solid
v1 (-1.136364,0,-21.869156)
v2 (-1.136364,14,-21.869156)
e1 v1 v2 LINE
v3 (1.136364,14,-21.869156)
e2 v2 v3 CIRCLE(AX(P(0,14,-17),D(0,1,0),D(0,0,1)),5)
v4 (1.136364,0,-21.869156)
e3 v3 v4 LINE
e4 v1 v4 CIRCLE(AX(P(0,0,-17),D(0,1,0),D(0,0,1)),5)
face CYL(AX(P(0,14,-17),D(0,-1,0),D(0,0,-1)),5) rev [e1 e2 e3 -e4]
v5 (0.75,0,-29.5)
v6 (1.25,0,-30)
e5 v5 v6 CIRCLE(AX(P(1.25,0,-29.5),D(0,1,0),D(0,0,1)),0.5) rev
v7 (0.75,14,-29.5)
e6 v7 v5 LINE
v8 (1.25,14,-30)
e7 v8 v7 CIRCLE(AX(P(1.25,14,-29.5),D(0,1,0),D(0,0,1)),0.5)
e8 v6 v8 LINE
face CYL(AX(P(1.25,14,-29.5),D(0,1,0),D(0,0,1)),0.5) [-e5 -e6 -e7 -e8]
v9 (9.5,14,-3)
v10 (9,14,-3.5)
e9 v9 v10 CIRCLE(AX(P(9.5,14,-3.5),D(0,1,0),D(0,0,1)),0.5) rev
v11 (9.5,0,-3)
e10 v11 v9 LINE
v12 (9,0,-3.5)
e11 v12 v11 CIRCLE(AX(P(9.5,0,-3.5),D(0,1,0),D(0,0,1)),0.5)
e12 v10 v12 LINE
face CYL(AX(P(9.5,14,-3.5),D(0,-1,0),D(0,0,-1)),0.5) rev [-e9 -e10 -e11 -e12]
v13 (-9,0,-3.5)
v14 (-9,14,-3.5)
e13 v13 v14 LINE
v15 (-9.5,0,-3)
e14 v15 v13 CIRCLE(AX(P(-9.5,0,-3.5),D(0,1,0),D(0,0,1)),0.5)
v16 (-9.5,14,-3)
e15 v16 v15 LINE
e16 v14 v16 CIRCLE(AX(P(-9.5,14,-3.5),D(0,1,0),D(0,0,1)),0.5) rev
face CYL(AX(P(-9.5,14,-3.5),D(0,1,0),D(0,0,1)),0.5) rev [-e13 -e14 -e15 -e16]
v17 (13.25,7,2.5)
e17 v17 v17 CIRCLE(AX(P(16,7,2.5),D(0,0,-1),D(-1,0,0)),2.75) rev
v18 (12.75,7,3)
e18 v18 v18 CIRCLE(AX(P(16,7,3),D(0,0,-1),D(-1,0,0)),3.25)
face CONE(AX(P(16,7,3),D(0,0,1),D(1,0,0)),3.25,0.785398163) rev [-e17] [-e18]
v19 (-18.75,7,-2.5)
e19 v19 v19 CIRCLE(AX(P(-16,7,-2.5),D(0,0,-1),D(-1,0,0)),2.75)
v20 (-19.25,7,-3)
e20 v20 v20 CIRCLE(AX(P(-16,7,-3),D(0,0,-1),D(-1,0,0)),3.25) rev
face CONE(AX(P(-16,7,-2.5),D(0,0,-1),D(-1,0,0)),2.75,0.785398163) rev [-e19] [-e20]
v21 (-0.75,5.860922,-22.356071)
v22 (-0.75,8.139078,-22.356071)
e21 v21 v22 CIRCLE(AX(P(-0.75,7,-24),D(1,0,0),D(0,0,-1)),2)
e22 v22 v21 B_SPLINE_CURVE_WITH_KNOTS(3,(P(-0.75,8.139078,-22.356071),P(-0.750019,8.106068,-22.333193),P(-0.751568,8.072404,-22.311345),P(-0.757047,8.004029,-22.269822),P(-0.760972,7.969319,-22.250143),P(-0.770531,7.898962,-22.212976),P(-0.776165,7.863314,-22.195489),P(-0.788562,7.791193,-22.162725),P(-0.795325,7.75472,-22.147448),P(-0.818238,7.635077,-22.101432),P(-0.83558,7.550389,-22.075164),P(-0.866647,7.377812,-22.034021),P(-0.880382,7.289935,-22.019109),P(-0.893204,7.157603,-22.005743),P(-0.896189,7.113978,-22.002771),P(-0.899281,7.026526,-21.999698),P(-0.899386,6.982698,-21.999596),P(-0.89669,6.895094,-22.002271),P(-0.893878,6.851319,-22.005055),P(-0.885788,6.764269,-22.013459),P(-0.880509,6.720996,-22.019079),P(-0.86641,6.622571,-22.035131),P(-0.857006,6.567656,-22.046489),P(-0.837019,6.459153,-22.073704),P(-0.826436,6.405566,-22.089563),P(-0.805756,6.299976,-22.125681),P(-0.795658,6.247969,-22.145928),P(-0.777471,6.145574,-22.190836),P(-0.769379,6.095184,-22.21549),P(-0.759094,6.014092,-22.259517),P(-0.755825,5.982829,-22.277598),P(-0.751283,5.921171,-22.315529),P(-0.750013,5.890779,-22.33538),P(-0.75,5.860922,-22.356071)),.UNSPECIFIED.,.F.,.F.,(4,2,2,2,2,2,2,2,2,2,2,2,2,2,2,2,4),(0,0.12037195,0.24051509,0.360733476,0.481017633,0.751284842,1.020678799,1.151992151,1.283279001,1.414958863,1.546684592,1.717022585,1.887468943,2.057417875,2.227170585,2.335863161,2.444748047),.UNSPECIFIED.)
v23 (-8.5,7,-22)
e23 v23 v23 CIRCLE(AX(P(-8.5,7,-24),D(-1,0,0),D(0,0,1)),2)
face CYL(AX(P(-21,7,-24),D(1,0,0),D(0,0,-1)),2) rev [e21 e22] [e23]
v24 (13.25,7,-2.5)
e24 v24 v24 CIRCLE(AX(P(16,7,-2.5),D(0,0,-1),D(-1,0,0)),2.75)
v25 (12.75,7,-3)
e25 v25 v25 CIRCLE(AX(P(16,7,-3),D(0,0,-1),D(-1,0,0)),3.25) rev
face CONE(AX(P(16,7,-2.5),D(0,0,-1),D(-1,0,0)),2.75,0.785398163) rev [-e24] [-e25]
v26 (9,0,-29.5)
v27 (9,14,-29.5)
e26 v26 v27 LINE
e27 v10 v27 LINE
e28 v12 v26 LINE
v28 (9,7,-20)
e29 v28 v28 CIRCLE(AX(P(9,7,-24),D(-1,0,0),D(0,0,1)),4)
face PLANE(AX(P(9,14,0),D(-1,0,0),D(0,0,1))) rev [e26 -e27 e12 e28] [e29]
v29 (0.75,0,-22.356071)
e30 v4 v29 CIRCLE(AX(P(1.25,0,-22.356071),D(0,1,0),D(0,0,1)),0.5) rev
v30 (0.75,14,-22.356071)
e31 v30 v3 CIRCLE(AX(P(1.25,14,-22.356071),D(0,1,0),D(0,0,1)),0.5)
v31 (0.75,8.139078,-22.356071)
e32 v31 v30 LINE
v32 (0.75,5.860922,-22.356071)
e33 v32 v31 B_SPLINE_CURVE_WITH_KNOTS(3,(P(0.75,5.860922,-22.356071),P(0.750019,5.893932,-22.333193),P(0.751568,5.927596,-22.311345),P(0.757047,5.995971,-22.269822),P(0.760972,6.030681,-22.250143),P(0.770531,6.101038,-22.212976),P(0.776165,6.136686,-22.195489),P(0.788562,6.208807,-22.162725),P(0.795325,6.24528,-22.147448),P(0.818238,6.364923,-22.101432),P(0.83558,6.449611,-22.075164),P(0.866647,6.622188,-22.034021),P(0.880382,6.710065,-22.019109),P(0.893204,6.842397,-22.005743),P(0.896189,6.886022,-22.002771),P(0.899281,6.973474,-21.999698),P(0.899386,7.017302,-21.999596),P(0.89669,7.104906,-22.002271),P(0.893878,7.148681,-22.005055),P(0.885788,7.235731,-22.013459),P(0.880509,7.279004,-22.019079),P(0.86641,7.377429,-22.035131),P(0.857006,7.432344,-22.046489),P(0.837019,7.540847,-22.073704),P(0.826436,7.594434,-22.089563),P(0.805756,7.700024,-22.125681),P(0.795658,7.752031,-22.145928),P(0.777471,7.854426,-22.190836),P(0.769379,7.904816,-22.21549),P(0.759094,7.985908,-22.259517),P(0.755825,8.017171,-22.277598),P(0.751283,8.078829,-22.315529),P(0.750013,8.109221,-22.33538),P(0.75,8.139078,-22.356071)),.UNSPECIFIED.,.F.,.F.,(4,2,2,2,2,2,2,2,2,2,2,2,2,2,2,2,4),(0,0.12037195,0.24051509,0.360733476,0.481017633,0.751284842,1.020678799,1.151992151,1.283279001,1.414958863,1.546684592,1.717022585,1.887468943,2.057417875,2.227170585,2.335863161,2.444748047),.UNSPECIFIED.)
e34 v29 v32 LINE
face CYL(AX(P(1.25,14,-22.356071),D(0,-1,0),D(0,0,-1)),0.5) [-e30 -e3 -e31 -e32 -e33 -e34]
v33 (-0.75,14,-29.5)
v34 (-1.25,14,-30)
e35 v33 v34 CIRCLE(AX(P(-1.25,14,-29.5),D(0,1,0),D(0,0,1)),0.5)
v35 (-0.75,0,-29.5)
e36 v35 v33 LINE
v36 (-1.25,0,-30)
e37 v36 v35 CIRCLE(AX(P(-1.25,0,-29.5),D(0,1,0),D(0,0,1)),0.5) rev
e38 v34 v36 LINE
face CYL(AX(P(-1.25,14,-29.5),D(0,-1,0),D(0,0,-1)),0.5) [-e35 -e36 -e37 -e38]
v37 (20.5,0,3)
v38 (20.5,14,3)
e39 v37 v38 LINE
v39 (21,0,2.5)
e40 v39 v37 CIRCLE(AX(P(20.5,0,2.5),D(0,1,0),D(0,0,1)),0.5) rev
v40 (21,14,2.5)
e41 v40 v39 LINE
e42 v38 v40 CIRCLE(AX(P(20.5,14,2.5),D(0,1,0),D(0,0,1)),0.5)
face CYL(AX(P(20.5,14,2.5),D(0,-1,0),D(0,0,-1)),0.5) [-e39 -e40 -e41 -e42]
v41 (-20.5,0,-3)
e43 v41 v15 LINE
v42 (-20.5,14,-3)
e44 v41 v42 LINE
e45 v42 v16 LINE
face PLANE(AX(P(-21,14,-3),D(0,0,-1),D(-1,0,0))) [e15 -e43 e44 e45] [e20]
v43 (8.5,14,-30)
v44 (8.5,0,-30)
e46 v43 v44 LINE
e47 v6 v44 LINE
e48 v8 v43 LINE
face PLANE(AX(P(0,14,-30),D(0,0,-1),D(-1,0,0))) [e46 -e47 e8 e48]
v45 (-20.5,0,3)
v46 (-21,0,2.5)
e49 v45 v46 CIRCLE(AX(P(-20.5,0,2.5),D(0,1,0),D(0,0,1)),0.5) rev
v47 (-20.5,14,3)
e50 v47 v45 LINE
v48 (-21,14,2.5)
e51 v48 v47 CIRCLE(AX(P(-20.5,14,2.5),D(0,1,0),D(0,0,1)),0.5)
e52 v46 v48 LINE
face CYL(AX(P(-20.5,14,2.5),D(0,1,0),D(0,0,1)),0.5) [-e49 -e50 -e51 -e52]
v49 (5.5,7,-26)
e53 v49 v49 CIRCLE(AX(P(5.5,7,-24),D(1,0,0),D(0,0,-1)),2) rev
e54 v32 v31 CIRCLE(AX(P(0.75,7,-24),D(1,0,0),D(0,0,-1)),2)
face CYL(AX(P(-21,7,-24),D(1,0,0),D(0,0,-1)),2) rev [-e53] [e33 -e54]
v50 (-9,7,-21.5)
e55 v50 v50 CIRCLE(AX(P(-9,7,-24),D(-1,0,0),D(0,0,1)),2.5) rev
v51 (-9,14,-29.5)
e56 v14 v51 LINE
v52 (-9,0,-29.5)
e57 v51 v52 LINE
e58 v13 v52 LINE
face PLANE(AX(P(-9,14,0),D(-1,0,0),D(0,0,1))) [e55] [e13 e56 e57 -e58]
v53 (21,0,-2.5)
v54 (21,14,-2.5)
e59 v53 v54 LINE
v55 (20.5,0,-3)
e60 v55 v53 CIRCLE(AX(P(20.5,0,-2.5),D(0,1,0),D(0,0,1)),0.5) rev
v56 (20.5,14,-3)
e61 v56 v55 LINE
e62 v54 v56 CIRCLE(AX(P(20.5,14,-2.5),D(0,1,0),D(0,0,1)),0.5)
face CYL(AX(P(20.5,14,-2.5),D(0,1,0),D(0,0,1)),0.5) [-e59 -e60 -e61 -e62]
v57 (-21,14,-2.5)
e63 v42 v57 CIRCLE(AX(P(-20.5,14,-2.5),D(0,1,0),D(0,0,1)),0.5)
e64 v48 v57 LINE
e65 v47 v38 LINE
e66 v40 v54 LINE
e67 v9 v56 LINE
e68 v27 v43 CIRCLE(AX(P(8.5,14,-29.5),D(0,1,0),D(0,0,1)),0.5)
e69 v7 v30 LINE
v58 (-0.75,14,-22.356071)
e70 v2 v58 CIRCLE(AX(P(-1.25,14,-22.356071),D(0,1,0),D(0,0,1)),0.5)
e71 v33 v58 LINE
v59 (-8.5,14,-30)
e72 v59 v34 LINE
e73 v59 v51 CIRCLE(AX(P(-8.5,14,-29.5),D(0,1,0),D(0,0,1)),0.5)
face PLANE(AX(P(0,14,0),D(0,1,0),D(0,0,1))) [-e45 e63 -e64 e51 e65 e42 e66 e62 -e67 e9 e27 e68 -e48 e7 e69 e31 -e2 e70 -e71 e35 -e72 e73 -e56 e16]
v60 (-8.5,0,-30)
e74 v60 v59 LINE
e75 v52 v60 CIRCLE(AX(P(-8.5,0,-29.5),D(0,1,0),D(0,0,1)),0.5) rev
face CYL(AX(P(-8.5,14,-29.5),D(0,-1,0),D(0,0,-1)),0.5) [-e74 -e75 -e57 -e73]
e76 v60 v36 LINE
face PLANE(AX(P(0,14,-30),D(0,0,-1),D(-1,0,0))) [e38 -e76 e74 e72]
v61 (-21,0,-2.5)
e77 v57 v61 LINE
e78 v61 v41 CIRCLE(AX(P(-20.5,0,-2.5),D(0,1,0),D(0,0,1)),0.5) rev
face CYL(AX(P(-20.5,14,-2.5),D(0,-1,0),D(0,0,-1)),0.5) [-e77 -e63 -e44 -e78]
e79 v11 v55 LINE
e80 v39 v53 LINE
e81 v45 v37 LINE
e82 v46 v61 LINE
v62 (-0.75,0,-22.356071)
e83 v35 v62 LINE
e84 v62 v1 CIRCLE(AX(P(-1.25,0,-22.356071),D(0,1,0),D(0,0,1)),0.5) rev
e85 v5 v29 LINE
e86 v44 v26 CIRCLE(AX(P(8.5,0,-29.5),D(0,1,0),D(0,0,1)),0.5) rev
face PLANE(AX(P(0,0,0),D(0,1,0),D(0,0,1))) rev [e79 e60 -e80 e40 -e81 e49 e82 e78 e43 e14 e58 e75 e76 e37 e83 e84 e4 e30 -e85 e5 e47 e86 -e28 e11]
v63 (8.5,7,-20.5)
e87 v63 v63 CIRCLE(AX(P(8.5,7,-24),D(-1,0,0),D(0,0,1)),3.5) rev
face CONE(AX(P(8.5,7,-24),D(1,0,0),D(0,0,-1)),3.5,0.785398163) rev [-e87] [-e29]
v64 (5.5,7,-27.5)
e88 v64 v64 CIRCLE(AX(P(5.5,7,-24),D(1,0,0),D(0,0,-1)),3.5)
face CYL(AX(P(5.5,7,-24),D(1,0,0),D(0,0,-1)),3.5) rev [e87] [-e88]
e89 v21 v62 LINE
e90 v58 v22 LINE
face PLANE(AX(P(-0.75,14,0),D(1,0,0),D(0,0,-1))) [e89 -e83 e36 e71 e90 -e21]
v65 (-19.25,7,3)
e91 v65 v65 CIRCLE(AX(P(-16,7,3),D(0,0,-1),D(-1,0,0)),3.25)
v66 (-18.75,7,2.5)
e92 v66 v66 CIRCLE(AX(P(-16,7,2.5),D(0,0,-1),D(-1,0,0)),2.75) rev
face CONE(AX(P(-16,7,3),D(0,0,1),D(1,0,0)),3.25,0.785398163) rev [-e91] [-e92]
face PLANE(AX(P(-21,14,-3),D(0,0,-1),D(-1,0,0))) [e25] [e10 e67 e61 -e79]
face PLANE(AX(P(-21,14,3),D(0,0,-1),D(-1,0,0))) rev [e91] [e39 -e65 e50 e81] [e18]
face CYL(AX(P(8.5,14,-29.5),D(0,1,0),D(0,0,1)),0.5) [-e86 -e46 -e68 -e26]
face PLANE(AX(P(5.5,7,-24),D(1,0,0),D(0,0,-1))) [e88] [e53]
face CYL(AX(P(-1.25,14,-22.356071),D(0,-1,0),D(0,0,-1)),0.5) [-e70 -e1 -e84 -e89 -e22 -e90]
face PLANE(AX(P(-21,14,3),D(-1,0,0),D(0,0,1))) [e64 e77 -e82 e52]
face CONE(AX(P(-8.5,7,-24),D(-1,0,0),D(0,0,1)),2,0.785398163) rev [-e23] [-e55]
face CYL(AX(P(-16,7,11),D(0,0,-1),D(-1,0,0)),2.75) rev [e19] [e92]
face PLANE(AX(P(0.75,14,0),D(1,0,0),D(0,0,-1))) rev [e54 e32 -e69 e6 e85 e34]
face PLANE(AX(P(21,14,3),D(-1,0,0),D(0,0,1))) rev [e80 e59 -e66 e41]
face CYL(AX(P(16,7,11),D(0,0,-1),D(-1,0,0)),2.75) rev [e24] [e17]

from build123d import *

# Parameters (mm, degrees)
BOSS_EXTRUDE1_DEPTH = 14
SKETCH2_R           = 2.75
CUT_EXTRUDE1_DEPTH  = 14
SKETCH3_R           = 2
CUT_EXTRUDE2_DEPTH  = 45.676615807
SKETCH4_R           = 3.5
CUT_EXTRUDE3_DEPTH  = 3.5
FILLET1_R           = 0.5
CHAMFER1_SIZE       = 0.5


with BuildPart() as part:
    # Sketch1 → Boss-Extrude1 (new body)
    with BuildSketch(Plane(origin=(0, 0, 0), x_dir=(1, 0, 0), z_dir=(0, 1, 0))):
        with BuildLine():
            Line((-21, 3), (-21, -3))
            Line((-21, -3), (21, -3))
            Line((21, -3), (21, 3))
            Line((21, 3), (9, 3))
            Line((9, 3), (9, 30))
            Line((9, 30), (0.75, 30))
            Line((0.75, 30), (0.75, 21.943429983))
            ThreePointArc((0.75, 21.943429983), (0, 12), (-0.75, 21.943429983))
            Line((-0.75, 21.943429983), (-0.75, 30))
            Line((-0.75, 30), (-9, 30))
            Line((-9, 30), (-9, 3))
            Line((-9, 3), (-21, 3))
        make_face()
    extrude(amount=BOSS_EXTRUDE1_DEPTH)

    # Sketch2 → Cut-Extrude1 (cut)
    with BuildSketch(Plane(origin=(0, 0, -3), x_dir=(-1, 0, 0), z_dir=(0, 0, -1))):
        with BuildLine():
            Line((-18.75, 7), (-16, 7))
            Line((-16, 7), (-13.25, 7))
            ThreePointArc((-13.25, 7), (-16, 9.75), (-18.75, 7))
        make_face()
        with BuildLine():
            Line((-13.25, 7), (-16, 7))
            Line((-16, 7), (-18.75, 7))
            ThreePointArc((-18.75, 7), (-16, 4.25), (-13.25, 7))
        make_face()
        with Locations((16, 7)):
            Circle(SKETCH2_R)
    extrude(amount=-CUT_EXTRUDE1_DEPTH, mode=Mode.SUBTRACT)

    # Sketch3 → Cut-Extrude2 (cut, through all)
    with BuildSketch(Plane(origin=(9, 0, 0), x_dir=(0, 0, -1), z_dir=(1, 0, 0))):
        with Locations((24, 7)):
            Circle(SKETCH3_R)
    extrude(amount=-CUT_EXTRUDE2_DEPTH, mode=Mode.SUBTRACT)

    # Sketch4 → Cut-Extrude3 (cut)
    with BuildSketch(Plane(origin=(9, 0, 0), x_dir=(0, 0, -1), z_dir=(1, 0, 0))):
        with Locations((24, 7)):
            Circle(SKETCH4_R)
    extrude(amount=-CUT_EXTRUDE3_DEPTH, mode=Mode.SUBTRACT)

    # Fillet1
    # the kernel refuses this fillet: 0.5 mm, written as the material it adds along each edge
    with BuildSketch(Plane(origin=(9, 0, -3), x_dir=(1, 0, 0), z_dir=(0, 1, 0)), Plane(origin=(-9, 0, -3), x_dir=(0, 0, -1), z_dir=(0, 1, 0))) as fillet1_piece_1:
        with BuildLine():
            CenterArc((FILLET1_R, FILLET1_R), FILLET1_R, 180, 90)
            Line((0, FILLET1_R), (0, 0))
            Line((0, 0), (FILLET1_R, 0))
        make_face()
    extrude(amount=14)
    # the kernel refuses this fillet: 0.5 mm, written as the material it takes off along each edge
    with BuildSketch(Plane(origin=(0.75, -1.031603345, -21.943429983), x_dir=(0.9820189181944738, 0, 0.18878253178765073), z_dir=(0, 1, 0))) as fillet1_2_piece_1:
        with BuildLine():
            CenterArc((0.413109983, 0.499612866), FILLET1_R, 190.881742673, 76.863441213)
            Line((-0.077899477, 0.4052216), (0, 0))
            ThreePointArc((0, 0), (0.196719039, 0.003871337), (0.393438079, 0))
        make_face()
    extrude(amount=16.06320669, mode=Mode.SUBTRACT)
    with BuildSketch(Plane(origin=(0.75, -1.25, -30), x_dir=(0, 0, 1), z_dir=(0, 1, 0))) as fillet1_2_piece_2:
        with BuildLine():
            CenterArc((FILLET1_R, FILLET1_R), FILLET1_R, 180, 90)
            Line((0, FILLET1_R), (0, 0))
            Line((0, 0), (FILLET1_R, 0))
        make_face()
    extrude(amount=16.5, mode=Mode.SUBTRACT)
    with BuildSketch(Plane(origin=(9, -1.25, -30), x_dir=(0, 0, 1), z_dir=(0, 1, 0)), Plane(origin=(-9, -1.25, -30), x_dir=(1, 0, 0), z_dir=(0, 1, 0)), Plane(origin=(-0.75, -1.25, -30), x_dir=(0, 0, 1), z_dir=(0, 1, 0)), Plane(origin=(21, -1.25, 3), x_dir=(-1, 0, 0), z_dir=(0, 1, 0)), Plane(origin=(21, -1.25, -3), x_dir=(0, 0, 1), z_dir=(0, 1, 0)), Plane(origin=(-21, -1.25, -3), x_dir=(1, 0, 0), z_dir=(0, 1, 0)), Plane(origin=(-21, -1.25, 3), x_dir=(0, 0, -1), z_dir=(0, 1, 0))) as fillet1_2_piece_3:
        with BuildLine():
            CenterArc((FILLET1_R, -FILLET1_R), FILLET1_R, 90, 90)
            Line((0, -FILLET1_R), (0, 0))
            Line((0, 0), (FILLET1_R, 0))
        make_face()
    extrude(amount=16.5, mode=Mode.SUBTRACT)
    with BuildSketch(Plane(origin=(-0.75, -1.031603345, -21.943429983), x_dir=(0, 0, -1), z_dir=(0, 1, 0))) as fillet1_2_piece_4:
        with BuildLine():
            CenterArc((0.412641338, 0.5), FILLET1_R, 193.136558787, 76.863441213)
            ThreePointArc((-0.074274237, 0.386363636), (-0.033335392, 0.193912659), (0, 0))
            Line((0, 0), (0.412641338, 0))
        make_face()
    extrude(amount=16.06320669, mode=Mode.SUBTRACT)

    # Chamfer1
    chamfer1_edges = [part.edges().sort_by_distance(p)[0] for p in [
        (-13.25, 7, 3),
        (-13.25, 7, -3),
        (13.25, 7, 3),
        (13.25, 7, -3),
        (-9, 7, -22),
        (9, 7, -20.5),
    ]]
    chamfer(chamfer1_edges, length=CHAMFER1_SIZE)


solid = part.part
